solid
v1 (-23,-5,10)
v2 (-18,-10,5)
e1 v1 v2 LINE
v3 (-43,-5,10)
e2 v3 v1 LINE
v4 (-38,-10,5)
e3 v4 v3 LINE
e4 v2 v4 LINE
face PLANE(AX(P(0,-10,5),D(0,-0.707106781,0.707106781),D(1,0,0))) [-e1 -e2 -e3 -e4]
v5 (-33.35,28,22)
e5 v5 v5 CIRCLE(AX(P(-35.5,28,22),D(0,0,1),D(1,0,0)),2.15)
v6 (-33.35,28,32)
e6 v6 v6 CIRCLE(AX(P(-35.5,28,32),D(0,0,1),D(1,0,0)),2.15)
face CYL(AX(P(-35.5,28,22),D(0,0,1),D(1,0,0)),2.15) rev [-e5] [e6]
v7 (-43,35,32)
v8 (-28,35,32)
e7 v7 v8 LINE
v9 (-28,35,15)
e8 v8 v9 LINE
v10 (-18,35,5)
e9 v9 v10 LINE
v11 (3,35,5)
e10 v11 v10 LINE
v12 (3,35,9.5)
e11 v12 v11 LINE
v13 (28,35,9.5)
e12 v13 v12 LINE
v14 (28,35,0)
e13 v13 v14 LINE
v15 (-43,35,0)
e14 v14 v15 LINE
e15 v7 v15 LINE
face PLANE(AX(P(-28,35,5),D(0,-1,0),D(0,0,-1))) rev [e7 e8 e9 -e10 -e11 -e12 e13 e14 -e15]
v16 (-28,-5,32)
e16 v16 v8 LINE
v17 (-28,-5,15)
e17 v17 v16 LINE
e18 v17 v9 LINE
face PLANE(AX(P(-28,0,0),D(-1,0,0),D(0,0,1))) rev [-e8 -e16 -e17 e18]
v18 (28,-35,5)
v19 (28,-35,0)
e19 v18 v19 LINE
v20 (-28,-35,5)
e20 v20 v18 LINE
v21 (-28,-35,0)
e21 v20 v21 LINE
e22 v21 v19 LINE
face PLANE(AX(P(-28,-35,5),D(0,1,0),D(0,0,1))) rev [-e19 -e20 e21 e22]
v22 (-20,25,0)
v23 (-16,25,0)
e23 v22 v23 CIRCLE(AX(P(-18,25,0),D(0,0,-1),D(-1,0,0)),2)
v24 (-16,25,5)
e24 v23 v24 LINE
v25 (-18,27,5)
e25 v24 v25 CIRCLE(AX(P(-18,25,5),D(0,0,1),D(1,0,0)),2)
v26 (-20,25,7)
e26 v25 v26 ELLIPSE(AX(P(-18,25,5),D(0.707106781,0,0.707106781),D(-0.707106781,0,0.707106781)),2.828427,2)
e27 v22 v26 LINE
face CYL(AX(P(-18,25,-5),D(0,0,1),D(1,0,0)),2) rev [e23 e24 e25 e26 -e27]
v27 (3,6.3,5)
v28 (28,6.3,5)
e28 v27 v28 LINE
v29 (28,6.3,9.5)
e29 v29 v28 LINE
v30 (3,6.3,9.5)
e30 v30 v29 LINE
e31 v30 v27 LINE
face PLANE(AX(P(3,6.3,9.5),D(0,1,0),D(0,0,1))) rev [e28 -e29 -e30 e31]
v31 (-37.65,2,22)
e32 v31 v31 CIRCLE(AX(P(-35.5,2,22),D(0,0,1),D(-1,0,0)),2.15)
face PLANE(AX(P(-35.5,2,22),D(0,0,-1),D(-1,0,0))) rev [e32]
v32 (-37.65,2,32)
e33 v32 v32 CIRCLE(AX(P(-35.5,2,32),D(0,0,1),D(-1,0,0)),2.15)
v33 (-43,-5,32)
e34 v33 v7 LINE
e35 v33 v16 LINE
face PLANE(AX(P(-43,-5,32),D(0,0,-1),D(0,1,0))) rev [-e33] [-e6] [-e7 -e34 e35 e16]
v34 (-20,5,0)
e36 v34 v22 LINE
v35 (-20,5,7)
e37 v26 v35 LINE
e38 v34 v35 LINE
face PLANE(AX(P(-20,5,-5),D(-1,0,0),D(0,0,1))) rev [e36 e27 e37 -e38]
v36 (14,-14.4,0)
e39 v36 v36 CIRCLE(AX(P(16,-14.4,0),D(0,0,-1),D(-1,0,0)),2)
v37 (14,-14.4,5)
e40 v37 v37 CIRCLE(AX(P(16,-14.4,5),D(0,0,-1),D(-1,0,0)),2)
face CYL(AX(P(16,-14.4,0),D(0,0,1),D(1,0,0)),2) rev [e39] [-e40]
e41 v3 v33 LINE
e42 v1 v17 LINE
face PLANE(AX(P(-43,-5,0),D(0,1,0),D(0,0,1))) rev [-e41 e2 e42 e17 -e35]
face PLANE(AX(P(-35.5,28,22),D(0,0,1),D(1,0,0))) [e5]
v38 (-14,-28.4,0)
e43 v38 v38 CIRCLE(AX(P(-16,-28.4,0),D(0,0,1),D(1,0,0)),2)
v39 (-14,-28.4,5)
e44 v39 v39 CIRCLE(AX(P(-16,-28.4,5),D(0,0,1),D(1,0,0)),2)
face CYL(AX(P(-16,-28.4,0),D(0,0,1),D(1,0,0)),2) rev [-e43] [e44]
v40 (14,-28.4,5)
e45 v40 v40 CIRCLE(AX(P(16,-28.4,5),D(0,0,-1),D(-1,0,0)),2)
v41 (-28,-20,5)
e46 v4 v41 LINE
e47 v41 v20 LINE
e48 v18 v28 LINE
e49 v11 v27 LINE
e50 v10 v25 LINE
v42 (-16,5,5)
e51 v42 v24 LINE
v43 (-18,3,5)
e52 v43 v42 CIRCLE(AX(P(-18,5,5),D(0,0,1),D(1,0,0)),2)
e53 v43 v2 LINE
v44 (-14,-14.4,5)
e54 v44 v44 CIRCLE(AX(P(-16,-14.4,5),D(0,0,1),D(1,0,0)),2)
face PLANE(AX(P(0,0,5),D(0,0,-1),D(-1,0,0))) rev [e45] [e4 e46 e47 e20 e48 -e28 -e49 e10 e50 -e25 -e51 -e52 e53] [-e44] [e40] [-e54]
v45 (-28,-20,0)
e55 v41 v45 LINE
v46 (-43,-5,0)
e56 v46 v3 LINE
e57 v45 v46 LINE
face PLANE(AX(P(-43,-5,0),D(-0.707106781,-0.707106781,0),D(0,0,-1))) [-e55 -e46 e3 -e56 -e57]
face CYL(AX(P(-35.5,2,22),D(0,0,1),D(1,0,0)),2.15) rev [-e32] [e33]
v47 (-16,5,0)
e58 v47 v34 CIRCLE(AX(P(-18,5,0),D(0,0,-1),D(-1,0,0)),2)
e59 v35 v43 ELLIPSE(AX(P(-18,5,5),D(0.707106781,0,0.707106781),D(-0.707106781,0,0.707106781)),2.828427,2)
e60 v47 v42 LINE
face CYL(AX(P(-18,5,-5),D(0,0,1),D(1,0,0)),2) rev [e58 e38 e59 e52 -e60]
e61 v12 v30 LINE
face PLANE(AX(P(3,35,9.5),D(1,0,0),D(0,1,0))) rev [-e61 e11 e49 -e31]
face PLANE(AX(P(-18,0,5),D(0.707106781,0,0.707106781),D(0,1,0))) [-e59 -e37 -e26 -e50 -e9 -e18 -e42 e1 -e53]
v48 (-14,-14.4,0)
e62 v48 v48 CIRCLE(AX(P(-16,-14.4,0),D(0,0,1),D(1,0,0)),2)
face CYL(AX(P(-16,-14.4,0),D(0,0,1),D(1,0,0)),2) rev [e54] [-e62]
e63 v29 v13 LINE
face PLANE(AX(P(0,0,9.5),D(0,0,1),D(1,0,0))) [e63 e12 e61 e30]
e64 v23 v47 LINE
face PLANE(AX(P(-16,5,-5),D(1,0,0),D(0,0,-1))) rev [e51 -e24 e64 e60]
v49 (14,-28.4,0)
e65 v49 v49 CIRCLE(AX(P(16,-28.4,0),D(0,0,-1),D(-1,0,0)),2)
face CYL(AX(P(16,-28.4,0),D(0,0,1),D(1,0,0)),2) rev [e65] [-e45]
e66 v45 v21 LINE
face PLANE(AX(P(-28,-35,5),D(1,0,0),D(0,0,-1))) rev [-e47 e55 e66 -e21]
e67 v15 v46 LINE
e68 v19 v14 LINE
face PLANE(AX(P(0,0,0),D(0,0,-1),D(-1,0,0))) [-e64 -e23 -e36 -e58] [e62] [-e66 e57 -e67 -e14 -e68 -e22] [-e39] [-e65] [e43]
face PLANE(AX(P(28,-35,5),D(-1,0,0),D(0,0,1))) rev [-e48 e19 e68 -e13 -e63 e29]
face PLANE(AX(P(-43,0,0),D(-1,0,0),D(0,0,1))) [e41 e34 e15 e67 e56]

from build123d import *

# Parameters (mm, degrees)
SKETCH_1_W          = 56
SKETCH_1_H          = 70
EXTRUDE_1_DEPTH     = 5
SKETCH_2_R          = 2
CUT_EXTRUDE_1_DEPTH = 5
SKETCH_5_W          = 25
SKETCH_5_H          = 28.7
EXTRUDE_3_DEPTH     = 4.5
SKETCH_6_W          = 32
SKETCH_6_H          = 40
EXTRUDE_4_DEPTH     = 15
SKETCH_9_R          = 2.15
CUT_EXTRUDE_2_DEPTH = 10
CUT_EXTRUDE_3_DEPTH = 10
CHAMFER_START       = -5
CHAMFER_1_DEPTH     = 40
CHAMFER_1_2_DEPTH   = 10
CHAMFER_START_2     = 25
CHAMFER_1_3_DEPTH   = 10
CHAMFER_START_3     = 5
CHAMFER_1_4_DEPTH   = 3
CHAMFER_2_SIZE      = 15
CHAMFER_3_SIZE      = 5


with BuildPart() as part:
    # 草图1 → 凸台-拉伸1 (new body)
    with BuildSketch(Plane.XY):
        Rectangle(SKETCH_1_W, SKETCH_1_H)
    extrude(amount=EXTRUDE_1_DEPTH)

    # 草图2 → 切除-拉伸1 (cut)
    with BuildSketch(Plane.XY.offset(5)):
        with Locations((-16, -28.4)):
            Circle(SKETCH_2_R)
        with Locations((-16, -14.4)):
            Circle(SKETCH_2_R)
    cut_extrude_1 = extrude(amount=-CUT_EXTRUDE_1_DEPTH, mode=Mode.SUBTRACT)

    # 镜向1: 切除-拉伸1 across plane
    add(cut_extrude_1.mirror(Plane(origin=(0, 0, 0), x_dir=(0, 0, 1), z_dir=(1, 0, 0))), mode=Mode.SUBTRACT)

    # 草图5 → 凸台-拉伸3 (add)
    with BuildSketch(Plane.XY.offset(5)):
        with Locations((15.5, 20.65)):
            Rectangle(SKETCH_5_W, SKETCH_5_H)
    extrude(amount=EXTRUDE_3_DEPTH)

    # 草图6 → 凸台-拉伸4 (add)
    with BuildSketch(Plane.ZY.offset(28)):
        with Locations((16, 15)):
            Rectangle(SKETCH_6_W, SKETCH_6_H)
    extrude(amount=EXTRUDE_4_DEPTH)

    # 草图9 → 切除-拉伸2 (cut)
    with BuildSketch(Plane.XY.offset(32)):
        with Locations((-35.5, 28)):
            Circle(SKETCH_9_R)
        with Locations(Location((-35.5, 2, 0), (0, 0, 180))):
            Circle(SKETCH_9_R)
    extrude(amount=-CUT_EXTRUDE_2_DEPTH, mode=Mode.SUBTRACT)

    # 草图10 → 切除-拉伸3 (cut)
    with BuildSketch(Plane.XY.offset(5)):
        with BuildLine():
            Line((-20, 5), (-20, 25))
            ThreePointArc((-20, 25), (-18, 27), (-16, 25))
            Line((-16, 25), (-16, 5))
            ThreePointArc((-16, 5), (-18, 3), (-20, 5))
        make_face()
    extrude(amount=-CUT_EXTRUDE_3_DEPTH, mode=Mode.SUBTRACT)

    # 倒角1: read off the stored shape, not the designer's step
    # 倒角1 outline → 倒角1 (add)
    with BuildSketch(Plane(origin=(0, 0, 0), x_dir=(1, 0, 0), z_dir=(0, 1, 0)).offset(CHAMFER_START)):
        Polygon((-20, -7), (-20, -5), (-28, -5), (-28, -15), align=None)
    extrude(amount=CHAMFER_1_DEPTH)

    # Chamfer 1 2 outline → Chamfer 1 2 (add)
    with BuildSketch(Plane(origin=(0, 0, 0), x_dir=(1, 0, 0), z_dir=(0, 1, 0)).offset(CHAMFER_START)):
        Polygon((-18, -5), (-20, -5), (-20, -7), align=None)
    extrude(amount=CHAMFER_1_2_DEPTH)

    # Chamfer 1 3 outline → Chamfer 1 3 (add)
    with BuildSketch(Plane(origin=(0, 0, 0), x_dir=(1, 0, 0), z_dir=(0, 1, 0)).offset(CHAMFER_START_2)):
        Polygon((-18, -5), (-20, -5), (-20, -7), align=None)
    extrude(amount=CHAMFER_1_3_DEPTH)

    # Chamfer 1 4 outline → Chamfer 1 4 (cut)
    with BuildSketch(Plane.XY.offset(CHAMFER_START_3)):
        with BuildLine():
            Line((-16, 5), (-20, 5))
            ThreePointArc((-20, 5), (-18, 3), (-16, 5))
        make_face()
        with BuildLine():
            Line((-20, 25), (-16, 25))
            ThreePointArc((-16, 25), (-18, 27), (-20, 25))
        make_face()
    extrude(amount=CHAMFER_1_4_DEPTH, mode=Mode.SUBTRACT)

    # 倒角2
    chamfer_2_edges = [part.edges().sort_by_distance(p)[0] for p in [
        (-28, -5, 2.5),
    ]]
    chamfer(chamfer_2_edges, length=CHAMFER_2_SIZE - 0.0001)  # a hair under: the kernel refuses the full size

    # 倒角3
    chamfer_3_edges = [part.edges().sort_by_distance(p)[0] for p in [
        (-30.49995, -5, 5),
    ]]
    chamfer(chamfer_3_edges, length=CHAMFER_3_SIZE)


solid = part.part
